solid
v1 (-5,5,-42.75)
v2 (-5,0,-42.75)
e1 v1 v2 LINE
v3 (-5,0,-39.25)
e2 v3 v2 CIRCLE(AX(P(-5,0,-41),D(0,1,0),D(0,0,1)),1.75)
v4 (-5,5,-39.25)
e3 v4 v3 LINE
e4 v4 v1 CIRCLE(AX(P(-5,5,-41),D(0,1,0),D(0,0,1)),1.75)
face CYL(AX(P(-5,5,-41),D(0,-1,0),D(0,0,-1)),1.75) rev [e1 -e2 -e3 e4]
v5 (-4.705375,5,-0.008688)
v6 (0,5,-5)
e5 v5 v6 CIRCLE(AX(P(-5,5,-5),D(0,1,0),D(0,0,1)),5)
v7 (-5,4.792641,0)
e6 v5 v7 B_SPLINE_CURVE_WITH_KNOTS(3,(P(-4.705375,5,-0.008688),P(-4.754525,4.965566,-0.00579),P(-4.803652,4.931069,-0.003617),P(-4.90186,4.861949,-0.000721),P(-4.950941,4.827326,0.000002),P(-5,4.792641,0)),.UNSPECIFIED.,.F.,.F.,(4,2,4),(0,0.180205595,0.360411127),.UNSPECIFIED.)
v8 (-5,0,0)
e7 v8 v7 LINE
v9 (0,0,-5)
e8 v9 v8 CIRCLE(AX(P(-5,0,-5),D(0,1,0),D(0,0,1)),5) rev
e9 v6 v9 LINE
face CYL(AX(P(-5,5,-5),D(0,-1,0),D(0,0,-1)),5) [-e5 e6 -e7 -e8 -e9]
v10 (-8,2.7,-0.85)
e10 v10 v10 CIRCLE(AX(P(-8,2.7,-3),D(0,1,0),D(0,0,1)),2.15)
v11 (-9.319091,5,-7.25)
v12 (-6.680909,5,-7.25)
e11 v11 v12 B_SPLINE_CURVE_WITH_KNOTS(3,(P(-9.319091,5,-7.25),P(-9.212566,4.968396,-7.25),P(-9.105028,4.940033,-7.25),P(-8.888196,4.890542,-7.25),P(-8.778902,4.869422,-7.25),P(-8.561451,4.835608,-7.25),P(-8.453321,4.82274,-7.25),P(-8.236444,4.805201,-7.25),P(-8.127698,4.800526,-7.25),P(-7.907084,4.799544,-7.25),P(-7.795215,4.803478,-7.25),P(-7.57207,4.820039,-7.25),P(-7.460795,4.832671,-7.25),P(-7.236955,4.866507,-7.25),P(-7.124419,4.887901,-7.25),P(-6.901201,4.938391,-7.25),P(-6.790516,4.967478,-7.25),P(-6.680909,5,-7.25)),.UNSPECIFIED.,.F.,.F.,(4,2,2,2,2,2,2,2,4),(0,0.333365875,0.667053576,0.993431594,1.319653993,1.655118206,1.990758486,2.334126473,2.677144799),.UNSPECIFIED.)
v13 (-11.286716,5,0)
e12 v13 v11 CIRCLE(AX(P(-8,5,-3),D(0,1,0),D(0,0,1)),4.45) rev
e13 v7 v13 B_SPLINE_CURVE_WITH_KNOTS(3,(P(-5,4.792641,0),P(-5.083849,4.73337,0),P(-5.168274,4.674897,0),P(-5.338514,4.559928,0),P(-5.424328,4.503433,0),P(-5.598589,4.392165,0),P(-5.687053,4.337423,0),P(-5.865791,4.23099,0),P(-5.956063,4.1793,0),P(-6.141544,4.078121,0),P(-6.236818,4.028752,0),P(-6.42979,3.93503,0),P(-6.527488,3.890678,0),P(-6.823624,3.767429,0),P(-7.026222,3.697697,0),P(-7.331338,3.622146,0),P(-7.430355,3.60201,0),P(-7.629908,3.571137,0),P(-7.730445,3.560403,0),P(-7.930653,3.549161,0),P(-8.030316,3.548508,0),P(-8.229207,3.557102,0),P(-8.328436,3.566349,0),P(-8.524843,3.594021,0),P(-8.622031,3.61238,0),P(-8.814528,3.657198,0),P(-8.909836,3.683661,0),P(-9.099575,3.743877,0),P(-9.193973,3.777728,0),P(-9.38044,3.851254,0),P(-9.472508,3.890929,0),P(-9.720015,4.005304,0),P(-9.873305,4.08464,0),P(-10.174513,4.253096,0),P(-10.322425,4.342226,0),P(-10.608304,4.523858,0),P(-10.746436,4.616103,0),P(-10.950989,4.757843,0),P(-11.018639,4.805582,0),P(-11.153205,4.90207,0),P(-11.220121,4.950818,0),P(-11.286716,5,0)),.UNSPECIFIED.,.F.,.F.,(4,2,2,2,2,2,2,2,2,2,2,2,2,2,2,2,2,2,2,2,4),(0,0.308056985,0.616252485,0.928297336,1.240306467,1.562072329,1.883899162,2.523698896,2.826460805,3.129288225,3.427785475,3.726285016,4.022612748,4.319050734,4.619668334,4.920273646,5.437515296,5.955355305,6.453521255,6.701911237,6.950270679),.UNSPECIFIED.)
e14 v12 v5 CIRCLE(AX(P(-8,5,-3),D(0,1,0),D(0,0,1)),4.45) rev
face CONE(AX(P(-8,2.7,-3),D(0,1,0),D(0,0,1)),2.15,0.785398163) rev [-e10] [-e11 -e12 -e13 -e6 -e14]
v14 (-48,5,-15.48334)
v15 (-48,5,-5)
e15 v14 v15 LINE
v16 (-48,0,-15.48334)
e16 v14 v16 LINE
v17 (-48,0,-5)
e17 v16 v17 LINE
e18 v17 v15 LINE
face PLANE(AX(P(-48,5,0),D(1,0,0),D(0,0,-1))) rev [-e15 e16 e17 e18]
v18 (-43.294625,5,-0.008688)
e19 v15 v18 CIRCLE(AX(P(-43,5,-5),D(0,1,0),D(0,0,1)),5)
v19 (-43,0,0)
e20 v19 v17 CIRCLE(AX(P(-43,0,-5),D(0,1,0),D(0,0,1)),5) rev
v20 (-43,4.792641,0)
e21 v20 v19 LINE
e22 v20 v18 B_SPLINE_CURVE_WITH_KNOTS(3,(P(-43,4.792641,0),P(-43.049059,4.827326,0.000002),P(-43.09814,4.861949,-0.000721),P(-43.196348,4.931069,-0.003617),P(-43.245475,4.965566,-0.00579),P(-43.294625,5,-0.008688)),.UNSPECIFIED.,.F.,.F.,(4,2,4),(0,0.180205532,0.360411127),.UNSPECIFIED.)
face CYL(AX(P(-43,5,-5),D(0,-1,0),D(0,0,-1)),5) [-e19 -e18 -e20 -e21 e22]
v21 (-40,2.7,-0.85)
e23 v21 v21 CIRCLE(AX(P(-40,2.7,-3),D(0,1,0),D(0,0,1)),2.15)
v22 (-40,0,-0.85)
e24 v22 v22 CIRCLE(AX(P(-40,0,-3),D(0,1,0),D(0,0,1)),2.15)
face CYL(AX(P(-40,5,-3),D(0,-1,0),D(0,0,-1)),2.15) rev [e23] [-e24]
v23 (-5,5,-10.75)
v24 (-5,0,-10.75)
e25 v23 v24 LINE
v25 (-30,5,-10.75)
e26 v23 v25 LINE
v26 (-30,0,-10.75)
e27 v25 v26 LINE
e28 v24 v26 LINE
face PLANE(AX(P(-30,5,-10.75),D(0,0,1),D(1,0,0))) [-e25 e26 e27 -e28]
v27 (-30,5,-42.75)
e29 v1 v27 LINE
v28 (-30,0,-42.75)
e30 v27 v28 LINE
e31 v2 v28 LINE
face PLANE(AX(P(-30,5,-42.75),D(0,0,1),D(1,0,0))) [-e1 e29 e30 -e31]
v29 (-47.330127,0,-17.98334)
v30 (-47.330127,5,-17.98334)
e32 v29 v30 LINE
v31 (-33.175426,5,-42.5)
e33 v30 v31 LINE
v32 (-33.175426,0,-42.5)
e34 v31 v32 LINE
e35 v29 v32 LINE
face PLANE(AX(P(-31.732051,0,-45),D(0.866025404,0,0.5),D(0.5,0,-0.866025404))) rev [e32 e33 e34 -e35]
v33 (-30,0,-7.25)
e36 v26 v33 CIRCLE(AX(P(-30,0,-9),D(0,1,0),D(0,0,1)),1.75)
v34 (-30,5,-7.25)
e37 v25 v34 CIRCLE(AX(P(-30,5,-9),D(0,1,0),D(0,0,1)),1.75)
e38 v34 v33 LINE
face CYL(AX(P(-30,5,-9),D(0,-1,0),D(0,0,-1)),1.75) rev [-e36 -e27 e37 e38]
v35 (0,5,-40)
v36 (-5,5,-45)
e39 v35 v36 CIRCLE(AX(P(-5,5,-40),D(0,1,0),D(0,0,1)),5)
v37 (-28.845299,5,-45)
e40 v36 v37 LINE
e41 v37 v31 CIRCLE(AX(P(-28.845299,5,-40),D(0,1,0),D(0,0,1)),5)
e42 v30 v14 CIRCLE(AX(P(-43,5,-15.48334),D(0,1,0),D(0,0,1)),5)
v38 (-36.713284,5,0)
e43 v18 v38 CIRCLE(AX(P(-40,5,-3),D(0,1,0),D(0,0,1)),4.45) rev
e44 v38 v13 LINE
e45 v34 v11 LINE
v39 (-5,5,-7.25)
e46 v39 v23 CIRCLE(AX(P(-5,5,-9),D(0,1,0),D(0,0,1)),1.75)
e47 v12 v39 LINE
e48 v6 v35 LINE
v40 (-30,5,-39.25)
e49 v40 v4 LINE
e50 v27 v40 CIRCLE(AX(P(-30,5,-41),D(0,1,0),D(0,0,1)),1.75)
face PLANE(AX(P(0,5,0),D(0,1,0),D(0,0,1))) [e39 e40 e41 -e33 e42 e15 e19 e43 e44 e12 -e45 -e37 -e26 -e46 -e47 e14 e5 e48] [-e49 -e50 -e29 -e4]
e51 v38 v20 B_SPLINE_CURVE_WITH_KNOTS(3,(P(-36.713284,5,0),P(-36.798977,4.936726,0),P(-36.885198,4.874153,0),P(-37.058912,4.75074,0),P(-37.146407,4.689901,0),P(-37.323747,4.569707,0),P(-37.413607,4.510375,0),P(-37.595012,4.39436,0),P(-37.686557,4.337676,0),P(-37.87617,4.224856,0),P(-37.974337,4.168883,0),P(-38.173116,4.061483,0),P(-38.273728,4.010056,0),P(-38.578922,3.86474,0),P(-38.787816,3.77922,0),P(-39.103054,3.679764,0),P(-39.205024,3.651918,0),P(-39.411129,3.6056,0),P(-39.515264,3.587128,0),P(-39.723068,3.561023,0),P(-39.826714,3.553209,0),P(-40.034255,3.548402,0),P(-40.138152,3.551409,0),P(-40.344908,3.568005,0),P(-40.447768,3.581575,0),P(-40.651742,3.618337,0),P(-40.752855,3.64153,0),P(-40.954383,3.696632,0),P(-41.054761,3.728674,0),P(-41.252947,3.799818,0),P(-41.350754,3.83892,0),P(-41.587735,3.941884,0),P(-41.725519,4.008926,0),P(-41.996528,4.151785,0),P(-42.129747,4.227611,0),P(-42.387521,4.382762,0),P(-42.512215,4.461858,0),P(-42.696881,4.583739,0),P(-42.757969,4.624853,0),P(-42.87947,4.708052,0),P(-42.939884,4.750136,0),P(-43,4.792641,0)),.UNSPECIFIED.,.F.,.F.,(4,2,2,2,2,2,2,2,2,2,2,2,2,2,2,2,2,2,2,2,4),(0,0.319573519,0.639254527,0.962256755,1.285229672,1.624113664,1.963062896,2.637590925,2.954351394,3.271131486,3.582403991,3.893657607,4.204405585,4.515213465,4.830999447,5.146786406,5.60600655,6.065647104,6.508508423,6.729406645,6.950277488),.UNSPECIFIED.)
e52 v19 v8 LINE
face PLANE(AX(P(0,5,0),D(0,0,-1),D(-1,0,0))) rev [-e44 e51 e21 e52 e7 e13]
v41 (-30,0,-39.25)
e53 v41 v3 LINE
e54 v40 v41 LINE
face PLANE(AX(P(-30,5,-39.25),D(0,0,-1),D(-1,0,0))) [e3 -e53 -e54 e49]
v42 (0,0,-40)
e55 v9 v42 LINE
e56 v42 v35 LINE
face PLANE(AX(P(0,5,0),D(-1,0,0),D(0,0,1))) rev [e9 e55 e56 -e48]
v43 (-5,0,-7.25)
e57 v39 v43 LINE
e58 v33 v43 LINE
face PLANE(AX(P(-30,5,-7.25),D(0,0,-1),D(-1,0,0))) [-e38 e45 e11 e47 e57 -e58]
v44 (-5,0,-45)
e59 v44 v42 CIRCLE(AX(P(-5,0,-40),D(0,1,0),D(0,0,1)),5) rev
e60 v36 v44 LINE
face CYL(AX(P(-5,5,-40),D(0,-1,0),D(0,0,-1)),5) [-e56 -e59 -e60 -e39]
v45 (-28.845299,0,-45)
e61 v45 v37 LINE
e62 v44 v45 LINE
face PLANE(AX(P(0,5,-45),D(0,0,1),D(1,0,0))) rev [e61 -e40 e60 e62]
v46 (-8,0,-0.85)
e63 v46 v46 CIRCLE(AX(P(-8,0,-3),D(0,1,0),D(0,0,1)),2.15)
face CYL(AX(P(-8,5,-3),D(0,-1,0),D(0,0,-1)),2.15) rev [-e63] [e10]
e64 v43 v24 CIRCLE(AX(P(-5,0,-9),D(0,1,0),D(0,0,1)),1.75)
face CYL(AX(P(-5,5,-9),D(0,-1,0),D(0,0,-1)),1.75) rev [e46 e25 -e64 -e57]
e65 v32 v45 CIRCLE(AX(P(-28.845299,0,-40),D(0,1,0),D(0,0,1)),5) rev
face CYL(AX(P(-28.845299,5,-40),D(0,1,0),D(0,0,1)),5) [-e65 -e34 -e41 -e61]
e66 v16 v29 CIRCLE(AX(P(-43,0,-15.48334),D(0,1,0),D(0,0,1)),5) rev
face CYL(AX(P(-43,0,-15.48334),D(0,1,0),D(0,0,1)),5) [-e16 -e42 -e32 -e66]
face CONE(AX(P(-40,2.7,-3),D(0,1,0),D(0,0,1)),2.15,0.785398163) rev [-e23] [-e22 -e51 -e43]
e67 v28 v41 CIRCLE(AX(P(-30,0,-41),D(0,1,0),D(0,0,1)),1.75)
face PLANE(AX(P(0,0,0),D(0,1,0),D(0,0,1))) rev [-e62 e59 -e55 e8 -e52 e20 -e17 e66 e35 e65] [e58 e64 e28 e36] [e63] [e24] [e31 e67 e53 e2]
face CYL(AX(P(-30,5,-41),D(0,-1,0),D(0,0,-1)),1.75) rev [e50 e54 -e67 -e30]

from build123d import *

# Parameters (mm, degrees)
SKETCH1_W               = 48
SKETCH1_H               = 45
SKETCH1_R               = 2.15
BOSS_EXTRUDE1_DEPTH     = 5
CUT_EXTRUDE1_DEPTH      = 66.984846745
CUT_EXTRUDE1_DEPTH_BACK = 66.984846745
FILLET1_R               = 5
CHAMFER1_SIZE           = 2.3


with BuildPart() as part:
    # Sketch1 → Boss-Extrude1 (new body)
    with BuildSketch(Plane(origin=(0, 0, 0), x_dir=(1, 0, 0), z_dir=(0, 1, 0))):
        with Locations((-24, 22.5)):
            Rectangle(SKETCH1_W, SKETCH1_H)
        with Locations(Location((-40, 3, 0), (0, 0, 270))):
            Circle(SKETCH1_R, mode=Mode.SUBTRACT)
        with Locations(Location((-8, 3, 0), (0, 0, 270))):
            Circle(SKETCH1_R, mode=Mode.SUBTRACT)
        with BuildLine():
            Line((-30, 10.75), (-5, 10.75))
            ThreePointArc((-5, 10.75), (-3.25, 9), (-5, 7.25))
            Line((-5, 7.25), (-30, 7.25))
            ThreePointArc((-30, 7.25), (-31.75, 9), (-30, 10.75))
        make_face(mode=Mode.SUBTRACT)
        with BuildLine():
            Line((-30, 42.75), (-5, 42.75))
            ThreePointArc((-5, 42.75), (-3.25, 41), (-5, 39.25))
            Line((-5, 39.25), (-30, 39.25))
            ThreePointArc((-30, 39.25), (-31.75, 41), (-30, 42.75))
        make_face(mode=Mode.SUBTRACT)
    extrude(amount=BOSS_EXTRUDE1_DEPTH)

    # Sketch2 → Cut-Extrude1 (cut, two sides: drawn at the far end of the back side and taken through both)
    with BuildSketch(Plane(origin=(0, 5, 0), x_dir=(1, 0, 0), z_dir=(0, 1, 0)).offset(-CUT_EXTRUDE1_DEPTH_BACK)):
        Polygon((-31.732050808, 45), (-48, 16.823085464), (-48, 45), align=None)
    extrude(amount=CUT_EXTRUDE1_DEPTH + CUT_EXTRUDE1_DEPTH_BACK, mode=Mode.SUBTRACT)

    # Fillet1
    fillet1_edges = [part.edges().sort_by_distance(p)[0] for p in [
        (-31.732050808, 2.5, -45),
        (-48, 2.5, -16.823085464),
        (0, 2.5, 0),
        (-48, 2.5, 0),
        (0, 2.5, -45),
    ]]
    fillet(fillet1_edges, radius=FILLET1_R)

    # Chamfer1
    # the kernel refuses this chamfer: 2.3 mm, written as the material it takes off along each edge
    with BuildSketch(Plane(origin=(-40, 5, -3), x_dir=(0, 0, 1), z_dir=(-1, 0, 0))) as chamfer1_piece_1:
        Polygon((2.15 + CHAMFER1_SIZE, 0), (2.15, -CHAMFER1_SIZE), (2.15, 0), align=None)
    revolve(axis=Axis((-40, 5, -3), (0, 1, 0)), mode=Mode.SUBTRACT)
    with BuildSketch(Plane(origin=(-8, 5, -3), x_dir=(0, 0, 1), z_dir=(-1, 0, 0))) as chamfer1_piece_2:
        Polygon((2.15 + CHAMFER1_SIZE, 0), (2.15, -CHAMFER1_SIZE), (2.15, 0), align=None)
    revolve(axis=Axis((-8, 5, -3), (0, 1, 0)), mode=Mode.SUBTRACT)


solid = part.part
